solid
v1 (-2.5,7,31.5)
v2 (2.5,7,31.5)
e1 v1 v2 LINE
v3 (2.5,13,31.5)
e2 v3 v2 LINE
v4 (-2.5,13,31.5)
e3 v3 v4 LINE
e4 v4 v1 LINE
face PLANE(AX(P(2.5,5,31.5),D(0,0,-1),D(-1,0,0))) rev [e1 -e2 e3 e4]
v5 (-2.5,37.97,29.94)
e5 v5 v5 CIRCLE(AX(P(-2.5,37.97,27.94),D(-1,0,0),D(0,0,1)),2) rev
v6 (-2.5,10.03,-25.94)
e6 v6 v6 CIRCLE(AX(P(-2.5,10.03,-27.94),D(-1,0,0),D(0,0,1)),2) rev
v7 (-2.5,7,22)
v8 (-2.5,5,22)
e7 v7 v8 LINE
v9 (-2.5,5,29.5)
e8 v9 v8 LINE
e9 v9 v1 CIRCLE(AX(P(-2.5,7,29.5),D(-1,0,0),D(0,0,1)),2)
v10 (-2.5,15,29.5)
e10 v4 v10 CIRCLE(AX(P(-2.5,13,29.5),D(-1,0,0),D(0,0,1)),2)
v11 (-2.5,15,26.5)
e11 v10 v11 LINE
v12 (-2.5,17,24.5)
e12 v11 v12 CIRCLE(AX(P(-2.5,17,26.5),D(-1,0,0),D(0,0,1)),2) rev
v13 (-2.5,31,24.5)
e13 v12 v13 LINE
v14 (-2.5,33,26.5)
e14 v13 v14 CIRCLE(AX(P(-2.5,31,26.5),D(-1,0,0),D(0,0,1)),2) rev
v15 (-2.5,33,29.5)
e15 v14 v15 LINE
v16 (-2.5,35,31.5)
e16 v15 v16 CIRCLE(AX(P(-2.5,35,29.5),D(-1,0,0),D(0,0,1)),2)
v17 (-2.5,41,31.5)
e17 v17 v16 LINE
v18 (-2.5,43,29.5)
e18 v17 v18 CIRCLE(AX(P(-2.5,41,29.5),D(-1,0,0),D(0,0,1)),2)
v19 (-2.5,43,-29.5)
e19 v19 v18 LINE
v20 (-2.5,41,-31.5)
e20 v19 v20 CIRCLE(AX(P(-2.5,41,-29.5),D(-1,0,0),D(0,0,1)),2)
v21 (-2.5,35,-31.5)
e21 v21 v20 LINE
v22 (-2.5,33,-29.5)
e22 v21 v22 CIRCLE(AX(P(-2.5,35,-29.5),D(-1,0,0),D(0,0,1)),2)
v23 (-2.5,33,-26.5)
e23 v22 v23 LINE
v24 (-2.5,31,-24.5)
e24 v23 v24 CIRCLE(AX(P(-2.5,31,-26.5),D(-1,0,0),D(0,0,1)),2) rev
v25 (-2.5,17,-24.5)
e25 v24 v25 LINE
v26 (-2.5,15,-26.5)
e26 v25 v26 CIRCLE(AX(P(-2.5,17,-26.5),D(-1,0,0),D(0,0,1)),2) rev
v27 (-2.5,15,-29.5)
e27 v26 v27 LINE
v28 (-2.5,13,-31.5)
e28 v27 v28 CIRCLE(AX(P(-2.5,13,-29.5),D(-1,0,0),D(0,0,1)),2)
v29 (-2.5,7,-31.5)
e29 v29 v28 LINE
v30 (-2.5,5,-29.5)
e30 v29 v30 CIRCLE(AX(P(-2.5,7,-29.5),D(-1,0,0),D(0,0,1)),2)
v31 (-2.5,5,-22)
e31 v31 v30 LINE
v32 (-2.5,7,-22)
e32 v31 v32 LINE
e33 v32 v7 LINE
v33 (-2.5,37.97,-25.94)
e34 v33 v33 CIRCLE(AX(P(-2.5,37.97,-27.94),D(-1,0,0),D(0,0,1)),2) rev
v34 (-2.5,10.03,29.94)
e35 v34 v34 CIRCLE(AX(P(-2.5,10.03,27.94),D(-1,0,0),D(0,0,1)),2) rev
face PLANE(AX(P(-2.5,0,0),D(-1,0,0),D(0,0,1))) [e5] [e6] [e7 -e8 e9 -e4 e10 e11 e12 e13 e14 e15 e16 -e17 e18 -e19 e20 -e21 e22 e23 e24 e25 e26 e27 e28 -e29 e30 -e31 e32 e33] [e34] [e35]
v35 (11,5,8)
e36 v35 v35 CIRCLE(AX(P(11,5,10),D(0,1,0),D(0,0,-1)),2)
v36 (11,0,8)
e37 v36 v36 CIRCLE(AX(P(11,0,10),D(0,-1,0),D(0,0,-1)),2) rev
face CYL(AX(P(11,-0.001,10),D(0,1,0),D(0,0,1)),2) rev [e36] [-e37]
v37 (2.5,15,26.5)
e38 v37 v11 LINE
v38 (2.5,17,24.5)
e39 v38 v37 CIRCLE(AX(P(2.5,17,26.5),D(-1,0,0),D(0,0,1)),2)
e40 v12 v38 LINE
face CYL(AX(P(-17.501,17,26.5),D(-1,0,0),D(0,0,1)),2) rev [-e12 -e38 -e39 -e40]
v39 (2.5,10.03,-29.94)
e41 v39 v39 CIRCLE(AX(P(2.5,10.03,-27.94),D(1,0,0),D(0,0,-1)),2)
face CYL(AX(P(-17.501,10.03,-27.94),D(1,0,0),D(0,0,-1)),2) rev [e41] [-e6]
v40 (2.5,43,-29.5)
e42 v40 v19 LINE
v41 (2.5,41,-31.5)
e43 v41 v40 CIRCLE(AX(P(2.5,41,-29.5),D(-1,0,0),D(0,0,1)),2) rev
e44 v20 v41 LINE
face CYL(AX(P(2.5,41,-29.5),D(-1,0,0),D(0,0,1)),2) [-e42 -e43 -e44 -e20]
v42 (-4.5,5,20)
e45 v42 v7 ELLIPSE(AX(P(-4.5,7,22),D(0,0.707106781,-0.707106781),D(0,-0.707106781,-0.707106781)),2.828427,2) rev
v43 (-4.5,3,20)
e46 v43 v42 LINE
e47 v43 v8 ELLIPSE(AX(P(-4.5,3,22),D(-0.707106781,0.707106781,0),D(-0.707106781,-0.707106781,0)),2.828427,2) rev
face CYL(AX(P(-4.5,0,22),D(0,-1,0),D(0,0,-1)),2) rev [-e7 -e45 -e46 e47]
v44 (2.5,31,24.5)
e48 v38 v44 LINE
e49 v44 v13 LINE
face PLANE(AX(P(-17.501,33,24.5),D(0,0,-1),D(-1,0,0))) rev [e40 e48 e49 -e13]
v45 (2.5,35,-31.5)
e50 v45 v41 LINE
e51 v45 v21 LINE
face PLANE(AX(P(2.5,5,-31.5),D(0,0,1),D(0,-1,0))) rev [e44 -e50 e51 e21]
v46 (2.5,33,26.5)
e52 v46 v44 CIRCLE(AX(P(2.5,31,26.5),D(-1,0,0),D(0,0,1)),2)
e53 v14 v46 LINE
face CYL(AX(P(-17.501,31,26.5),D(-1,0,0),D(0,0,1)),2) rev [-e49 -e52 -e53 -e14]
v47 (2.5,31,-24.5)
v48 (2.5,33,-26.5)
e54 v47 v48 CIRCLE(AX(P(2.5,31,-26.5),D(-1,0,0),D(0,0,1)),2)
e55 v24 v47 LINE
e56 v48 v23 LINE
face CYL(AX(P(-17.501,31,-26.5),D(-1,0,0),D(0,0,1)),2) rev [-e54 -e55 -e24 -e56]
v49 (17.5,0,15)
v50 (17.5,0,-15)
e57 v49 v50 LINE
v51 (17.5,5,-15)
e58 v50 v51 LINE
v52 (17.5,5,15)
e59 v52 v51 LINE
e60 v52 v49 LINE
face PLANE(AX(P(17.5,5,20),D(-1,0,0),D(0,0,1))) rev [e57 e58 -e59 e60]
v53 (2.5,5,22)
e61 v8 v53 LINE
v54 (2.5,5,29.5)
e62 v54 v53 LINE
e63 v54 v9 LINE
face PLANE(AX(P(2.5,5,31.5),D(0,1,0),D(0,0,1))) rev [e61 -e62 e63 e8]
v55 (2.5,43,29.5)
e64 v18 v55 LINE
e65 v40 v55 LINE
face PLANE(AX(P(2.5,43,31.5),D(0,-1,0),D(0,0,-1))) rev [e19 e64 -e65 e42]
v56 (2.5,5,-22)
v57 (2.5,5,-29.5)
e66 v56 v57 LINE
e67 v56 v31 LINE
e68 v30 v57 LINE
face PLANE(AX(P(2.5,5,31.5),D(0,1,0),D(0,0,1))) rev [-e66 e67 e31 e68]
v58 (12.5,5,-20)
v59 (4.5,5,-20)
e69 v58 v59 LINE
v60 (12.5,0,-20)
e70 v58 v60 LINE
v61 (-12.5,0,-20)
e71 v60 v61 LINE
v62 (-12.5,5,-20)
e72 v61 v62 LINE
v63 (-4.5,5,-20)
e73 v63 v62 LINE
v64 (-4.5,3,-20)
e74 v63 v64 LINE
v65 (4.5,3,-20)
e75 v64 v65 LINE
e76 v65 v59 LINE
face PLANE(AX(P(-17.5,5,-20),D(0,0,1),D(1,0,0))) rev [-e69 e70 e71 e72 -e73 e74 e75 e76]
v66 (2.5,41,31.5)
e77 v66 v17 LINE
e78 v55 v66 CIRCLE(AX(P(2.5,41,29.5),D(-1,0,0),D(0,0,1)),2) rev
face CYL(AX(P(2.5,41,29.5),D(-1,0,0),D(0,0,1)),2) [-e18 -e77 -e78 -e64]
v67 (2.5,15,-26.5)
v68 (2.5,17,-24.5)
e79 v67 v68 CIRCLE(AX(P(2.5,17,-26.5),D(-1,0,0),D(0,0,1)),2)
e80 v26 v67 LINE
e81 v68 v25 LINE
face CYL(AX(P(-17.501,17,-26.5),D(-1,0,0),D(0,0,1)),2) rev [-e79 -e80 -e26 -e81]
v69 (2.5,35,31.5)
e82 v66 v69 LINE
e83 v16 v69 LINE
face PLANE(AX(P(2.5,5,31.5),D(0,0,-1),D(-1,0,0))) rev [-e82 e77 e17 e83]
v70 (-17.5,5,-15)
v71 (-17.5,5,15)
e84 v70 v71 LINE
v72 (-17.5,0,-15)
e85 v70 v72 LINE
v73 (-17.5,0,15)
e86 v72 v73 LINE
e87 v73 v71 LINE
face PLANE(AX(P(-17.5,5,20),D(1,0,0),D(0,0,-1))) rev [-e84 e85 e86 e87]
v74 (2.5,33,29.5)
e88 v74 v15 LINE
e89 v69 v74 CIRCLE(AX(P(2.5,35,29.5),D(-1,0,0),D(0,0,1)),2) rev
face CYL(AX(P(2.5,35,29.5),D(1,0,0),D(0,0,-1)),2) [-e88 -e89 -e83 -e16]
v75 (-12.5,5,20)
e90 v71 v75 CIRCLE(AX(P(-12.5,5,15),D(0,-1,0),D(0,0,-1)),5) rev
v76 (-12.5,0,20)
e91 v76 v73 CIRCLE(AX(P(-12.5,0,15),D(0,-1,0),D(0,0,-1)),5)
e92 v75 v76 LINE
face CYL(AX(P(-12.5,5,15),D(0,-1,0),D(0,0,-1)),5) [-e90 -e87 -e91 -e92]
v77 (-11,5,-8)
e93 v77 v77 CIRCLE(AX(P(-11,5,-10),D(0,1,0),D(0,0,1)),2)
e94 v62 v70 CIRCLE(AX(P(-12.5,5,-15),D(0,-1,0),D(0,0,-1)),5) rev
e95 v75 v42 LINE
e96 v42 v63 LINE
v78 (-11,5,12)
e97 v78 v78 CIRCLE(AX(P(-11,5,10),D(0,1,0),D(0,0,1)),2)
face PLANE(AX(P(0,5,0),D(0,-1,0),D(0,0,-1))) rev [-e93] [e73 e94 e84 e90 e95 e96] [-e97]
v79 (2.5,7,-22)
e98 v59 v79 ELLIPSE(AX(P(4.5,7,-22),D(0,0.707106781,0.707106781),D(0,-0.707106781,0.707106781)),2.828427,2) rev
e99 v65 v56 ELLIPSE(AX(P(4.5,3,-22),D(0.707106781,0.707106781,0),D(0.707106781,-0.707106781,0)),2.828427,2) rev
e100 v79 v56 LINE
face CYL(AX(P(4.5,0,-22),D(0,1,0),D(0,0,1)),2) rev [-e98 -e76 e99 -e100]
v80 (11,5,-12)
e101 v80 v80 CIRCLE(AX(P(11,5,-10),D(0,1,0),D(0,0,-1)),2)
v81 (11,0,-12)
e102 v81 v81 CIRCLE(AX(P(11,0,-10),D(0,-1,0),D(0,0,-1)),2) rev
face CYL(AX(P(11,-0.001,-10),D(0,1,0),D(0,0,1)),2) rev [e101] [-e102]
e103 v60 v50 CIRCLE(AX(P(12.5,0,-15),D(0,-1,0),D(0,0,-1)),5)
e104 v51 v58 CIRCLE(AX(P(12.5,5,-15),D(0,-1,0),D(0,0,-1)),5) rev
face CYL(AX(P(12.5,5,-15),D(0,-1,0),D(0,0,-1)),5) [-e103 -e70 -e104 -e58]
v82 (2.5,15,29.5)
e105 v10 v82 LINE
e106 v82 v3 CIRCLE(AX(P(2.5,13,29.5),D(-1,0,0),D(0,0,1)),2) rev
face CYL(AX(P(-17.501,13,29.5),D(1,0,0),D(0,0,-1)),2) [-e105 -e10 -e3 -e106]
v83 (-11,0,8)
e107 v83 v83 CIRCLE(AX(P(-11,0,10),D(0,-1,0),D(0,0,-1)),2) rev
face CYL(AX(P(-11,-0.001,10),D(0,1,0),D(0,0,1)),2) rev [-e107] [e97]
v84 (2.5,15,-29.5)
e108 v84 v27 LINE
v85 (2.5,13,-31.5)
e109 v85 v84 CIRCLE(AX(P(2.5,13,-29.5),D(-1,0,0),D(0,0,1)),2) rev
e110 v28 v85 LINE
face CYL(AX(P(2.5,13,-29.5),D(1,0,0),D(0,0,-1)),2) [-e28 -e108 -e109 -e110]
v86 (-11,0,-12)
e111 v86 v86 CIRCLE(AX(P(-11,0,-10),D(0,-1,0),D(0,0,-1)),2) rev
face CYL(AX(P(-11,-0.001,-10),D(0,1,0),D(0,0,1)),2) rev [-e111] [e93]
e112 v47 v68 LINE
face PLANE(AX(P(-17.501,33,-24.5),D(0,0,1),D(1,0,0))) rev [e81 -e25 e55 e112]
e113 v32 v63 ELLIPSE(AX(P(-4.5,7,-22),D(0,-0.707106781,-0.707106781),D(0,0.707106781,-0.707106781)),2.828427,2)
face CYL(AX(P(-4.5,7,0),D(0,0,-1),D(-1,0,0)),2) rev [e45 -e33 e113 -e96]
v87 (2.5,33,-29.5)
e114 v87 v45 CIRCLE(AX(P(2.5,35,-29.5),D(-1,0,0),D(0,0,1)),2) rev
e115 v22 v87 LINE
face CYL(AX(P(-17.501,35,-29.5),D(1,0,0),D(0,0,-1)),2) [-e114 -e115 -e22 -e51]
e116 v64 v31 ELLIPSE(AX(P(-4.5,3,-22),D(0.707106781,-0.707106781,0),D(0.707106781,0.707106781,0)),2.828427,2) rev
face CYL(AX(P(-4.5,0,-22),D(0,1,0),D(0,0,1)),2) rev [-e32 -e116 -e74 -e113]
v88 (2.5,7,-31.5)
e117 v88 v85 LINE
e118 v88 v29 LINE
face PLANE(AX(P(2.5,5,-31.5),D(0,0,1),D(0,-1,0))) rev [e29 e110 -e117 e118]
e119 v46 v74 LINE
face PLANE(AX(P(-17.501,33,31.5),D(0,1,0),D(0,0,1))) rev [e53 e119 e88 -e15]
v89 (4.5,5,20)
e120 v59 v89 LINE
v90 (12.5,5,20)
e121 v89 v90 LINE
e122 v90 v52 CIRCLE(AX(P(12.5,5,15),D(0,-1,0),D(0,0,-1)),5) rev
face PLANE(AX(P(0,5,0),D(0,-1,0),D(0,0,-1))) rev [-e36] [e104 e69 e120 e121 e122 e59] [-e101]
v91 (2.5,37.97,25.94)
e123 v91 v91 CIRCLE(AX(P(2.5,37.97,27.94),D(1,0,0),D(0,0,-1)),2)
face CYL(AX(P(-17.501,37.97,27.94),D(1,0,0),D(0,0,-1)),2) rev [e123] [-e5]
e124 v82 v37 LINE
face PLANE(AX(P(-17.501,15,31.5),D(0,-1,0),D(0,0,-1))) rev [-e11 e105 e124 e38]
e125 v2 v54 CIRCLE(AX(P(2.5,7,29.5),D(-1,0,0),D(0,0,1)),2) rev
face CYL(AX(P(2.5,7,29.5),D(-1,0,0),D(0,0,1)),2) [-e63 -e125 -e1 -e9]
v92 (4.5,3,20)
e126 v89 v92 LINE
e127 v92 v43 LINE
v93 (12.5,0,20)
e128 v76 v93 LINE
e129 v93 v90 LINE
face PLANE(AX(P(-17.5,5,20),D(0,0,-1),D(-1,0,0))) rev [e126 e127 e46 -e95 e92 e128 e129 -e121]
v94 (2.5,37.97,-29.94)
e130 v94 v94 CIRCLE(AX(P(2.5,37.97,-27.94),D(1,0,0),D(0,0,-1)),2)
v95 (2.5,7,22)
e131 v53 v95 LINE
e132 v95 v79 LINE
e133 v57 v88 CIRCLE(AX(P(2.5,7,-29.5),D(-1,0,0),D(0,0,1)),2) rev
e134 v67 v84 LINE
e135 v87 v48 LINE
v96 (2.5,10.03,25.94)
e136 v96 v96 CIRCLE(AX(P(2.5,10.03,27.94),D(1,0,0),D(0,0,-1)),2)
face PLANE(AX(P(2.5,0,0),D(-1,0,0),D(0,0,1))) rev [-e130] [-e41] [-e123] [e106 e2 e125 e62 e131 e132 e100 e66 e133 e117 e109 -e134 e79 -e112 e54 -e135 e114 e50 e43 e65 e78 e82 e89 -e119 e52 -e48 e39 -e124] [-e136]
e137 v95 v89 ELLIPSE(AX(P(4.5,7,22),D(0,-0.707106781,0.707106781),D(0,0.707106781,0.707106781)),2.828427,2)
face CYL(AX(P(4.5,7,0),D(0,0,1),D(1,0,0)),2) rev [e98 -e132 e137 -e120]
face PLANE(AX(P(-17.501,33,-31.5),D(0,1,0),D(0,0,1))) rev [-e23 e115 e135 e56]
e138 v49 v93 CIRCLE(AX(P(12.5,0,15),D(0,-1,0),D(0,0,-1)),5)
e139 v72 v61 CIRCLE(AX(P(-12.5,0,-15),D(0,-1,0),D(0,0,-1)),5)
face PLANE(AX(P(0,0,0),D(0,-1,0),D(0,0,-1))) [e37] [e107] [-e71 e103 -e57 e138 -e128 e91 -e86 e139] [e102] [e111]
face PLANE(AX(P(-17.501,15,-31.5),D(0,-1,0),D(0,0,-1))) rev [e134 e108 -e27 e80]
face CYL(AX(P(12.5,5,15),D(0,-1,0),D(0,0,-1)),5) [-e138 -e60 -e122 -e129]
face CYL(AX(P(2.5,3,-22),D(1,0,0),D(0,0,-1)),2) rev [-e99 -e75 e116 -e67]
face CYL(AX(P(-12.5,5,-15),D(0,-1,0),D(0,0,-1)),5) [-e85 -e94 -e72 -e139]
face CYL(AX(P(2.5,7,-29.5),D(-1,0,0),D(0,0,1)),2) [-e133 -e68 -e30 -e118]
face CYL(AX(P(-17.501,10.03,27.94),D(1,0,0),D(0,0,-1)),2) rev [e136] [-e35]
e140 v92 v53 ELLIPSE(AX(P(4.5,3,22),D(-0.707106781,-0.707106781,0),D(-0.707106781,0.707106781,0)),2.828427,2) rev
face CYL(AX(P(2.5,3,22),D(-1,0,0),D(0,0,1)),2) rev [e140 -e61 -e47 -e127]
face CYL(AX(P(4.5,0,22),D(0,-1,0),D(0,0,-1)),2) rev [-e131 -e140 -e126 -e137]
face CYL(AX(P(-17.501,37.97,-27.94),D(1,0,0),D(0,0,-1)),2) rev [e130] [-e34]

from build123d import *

# Parameters (mm, degrees)
ESQUISSE2_W             = 35
ESQUISSE2_H             = 40
BOSS_EXTRU_1_DEPTH      = 5
ESQUISSE3_W             = 63
ESQUISSE3_H             = 38
BOSS_EXTRU_2_DEPTH      = 2.5
ENL_V_MAT_EXTRU_1_REACH = 58.932
ESQUISSE4_R             = 2
ENL_V_MAT_EXTRU_2_REACH = 58.932
ESQUISSE5_W             = 7
ESQUISSE5_H             = 18
CONG_1_R                = 2
CONG_2_R                = 5
CONG_3_R                = 2
ENL_V_MAT_EXTRU_3_REACH = 54.369
ESQUISSE6_R             = 2


with BuildPart() as part:
    # Esquisse2 → Boss.-Extru.1 (new body)
    with BuildSketch(Plane(origin=(0, 0, 0), x_dir=(1, 0, 0), z_dir=(0, 1, 0))):
        Rectangle(ESQUISSE2_W, ESQUISSE2_H)
    extrude(amount=BOSS_EXTRU_1_DEPTH)

    # Esquisse3 → Boss.-Extru.2 (add, symmetric)
    with BuildSketch(Plane(origin=(0, 0, 0), x_dir=(0, 0, -1), z_dir=(1, 0, 0))):
        with Locations((0, 24)):
            Rectangle(ESQUISSE3_W, ESQUISSE3_H)
    extrude(amount=BOSS_EXTRU_2_DEPTH, both=True)

    # Esquisse4 → Enlèv. mat.-Extru.1 (cut, up to next)
    with BuildSketch(Plane(origin=(2.5, 0, 0), x_dir=(0, 0, -1), z_dir=(1, 0, 0)), mode=Mode.PRIVATE) as enl_v_mat_extru_1_sk1:
        with Locations((-27.94, 37.97)):
            Circle(ESQUISSE4_R)
    enl_v_mat_extru_1_tool1 = extrude(enl_v_mat_extru_1_sk1.sketch, amount=-ENL_V_MAT_EXTRU_1_REACH, mode=Mode.PRIVATE) & part.part
    # Esquisse4 → Enlèv. mat.-Extru.1 (cut, up to next)
    with BuildSketch(Plane(origin=(2.5, 0, 0), x_dir=(0, 0, -1), z_dir=(1, 0, 0)), mode=Mode.PRIVATE) as enl_v_mat_extru_1_sk2:
        with Locations((-27.94, 10.03)):
            Circle(ESQUISSE4_R)
    enl_v_mat_extru_1_tool2 = extrude(enl_v_mat_extru_1_sk2.sketch, amount=-ENL_V_MAT_EXTRU_1_REACH, mode=Mode.PRIVATE) & part.part
    # Esquisse4 → Enlèv. mat.-Extru.1 (cut, up to next)
    with BuildSketch(Plane(origin=(2.5, 0, 0), x_dir=(0, 0, -1), z_dir=(1, 0, 0)), mode=Mode.PRIVATE) as enl_v_mat_extru_1_sk3:
        with Locations((27.94, 37.97)):
            Circle(ESQUISSE4_R)
    enl_v_mat_extru_1_tool3 = extrude(enl_v_mat_extru_1_sk3.sketch, amount=-ENL_V_MAT_EXTRU_1_REACH, mode=Mode.PRIVATE) & part.part
    # Esquisse4 → Enlèv. mat.-Extru.1 (cut, up to next)
    with BuildSketch(Plane(origin=(2.5, 0, 0), x_dir=(0, 0, -1), z_dir=(1, 0, 0)), mode=Mode.PRIVATE) as enl_v_mat_extru_1_sk4:
        with Locations((27.94, 10.03)):
            Circle(ESQUISSE4_R)
    enl_v_mat_extru_1_tool4 = extrude(enl_v_mat_extru_1_sk4.sketch, amount=-ENL_V_MAT_EXTRU_1_REACH, mode=Mode.PRIVATE) & part.part
    add(enl_v_mat_extru_1_tool1.solids().sort_by_distance((2.5, 37.97, 27.94))[0], mode=Mode.SUBTRACT)
    add(enl_v_mat_extru_1_tool2.solids().sort_by_distance((2.5, 10.03, 27.94))[0], mode=Mode.SUBTRACT)
    add(enl_v_mat_extru_1_tool3.solids().sort_by_distance((2.5, 37.97, -27.94))[0], mode=Mode.SUBTRACT)
    add(enl_v_mat_extru_1_tool4.solids().sort_by_distance((2.5, 10.03, -27.94))[0], mode=Mode.SUBTRACT)

    # Esquisse5 → Enlèv. mat.-Extru.2 (cut, up to next)
    with BuildSketch(Plane(origin=(2.5, 0, 0), x_dir=(0, 0, -1), z_dir=(1, 0, 0)), mode=Mode.PRIVATE) as enl_v_mat_extru_2_sk1:
        with Locations((-28, 24)):
            Rectangle(ESQUISSE5_W, ESQUISSE5_H)
    enl_v_mat_extru_2_tool1 = extrude(enl_v_mat_extru_2_sk1.sketch, amount=-ENL_V_MAT_EXTRU_2_REACH, mode=Mode.PRIVATE) & part.part
    # Esquisse5 → Enlèv. mat.-Extru.2 (cut, up to next)
    with BuildSketch(Plane(origin=(2.5, 0, 0), x_dir=(0, 0, -1), z_dir=(1, 0, 0)), mode=Mode.PRIVATE) as enl_v_mat_extru_2_sk2:
        with Locations((28, 24)):
            Rectangle(ESQUISSE5_W, ESQUISSE5_H)
    enl_v_mat_extru_2_tool2 = extrude(enl_v_mat_extru_2_sk2.sketch, amount=-ENL_V_MAT_EXTRU_2_REACH, mode=Mode.PRIVATE) & part.part
    add(enl_v_mat_extru_2_tool1.solids().sort_by_distance((2.5, 24, 28))[0], mode=Mode.SUBTRACT)
    add(enl_v_mat_extru_2_tool2.solids().sort_by_distance((2.5, 24, -28))[0], mode=Mode.SUBTRACT)

    # Congé1
    cong_1_edges = [part.edges().sort_by_distance(p)[0] for p in [
        (0, 15, -24.5),
        (0, 33, -24.5),
        (0, 15, 24.5),
        (0, 33, 24.5),
        (-2.5, 5, 0),
        (2.5, 5, 0),
    ]]
    fillet(cong_1_edges, radius=CONG_1_R)
    cong_1_2_edges = [part.edges().sort_by_distance(p)[0] for p in [
        (0, 5, -31.5),
        (0, 15, -31.5),
        (0, 43, -31.5),
        (0, 33, -31.5),
        (0, 5, 31.5),
        (0, 15, 31.5),
        (0, 33, 31.5),
        (0, 43, 31.5),
    ]]
    fillet(cong_1_2_edges, radius=CONG_1_R)

    # Congé2
    cong_2_edges = [part.edges().sort_by_distance(p)[0] for p in [
        (17.5, 2.5, 20),
        (-17.5, 2.5, 20),
        (-17.5, 2.5, -20),
        (17.5, 2.5, -20),
    ]]
    fillet(cong_2_edges, radius=CONG_2_R)

    # Congé3
    cong_3_edges = [part.edges().sort_by_distance(p)[0] for p in [
        (-2.5, 6, 20),
        (2.5, 6, 20),
        (0, 5, 20),
        (2.5, 6, -20),
        (-2.5, 6, -20),
        (0, 5, -20),
    ]]
    fillet(cong_3_edges, radius=CONG_3_R - 0.0001)  # a hair under: the kernel refuses the full size

    # Esquisse6 → Enlèv. mat.-Extru.3 (cut, up to next)
    with BuildSketch(Plane(origin=(0, 5, 0), x_dir=(1, 0, 0), z_dir=(0, 1, 0)), mode=Mode.PRIVATE) as enl_v_mat_extru_3_sk1:
        with Locations(Location((-11, 10, 0), (0, 0, 270))):
            Circle(ESQUISSE6_R)
    enl_v_mat_extru_3_tool1 = extrude(enl_v_mat_extru_3_sk1.sketch, amount=-ENL_V_MAT_EXTRU_3_REACH, mode=Mode.PRIVATE) & part.part
    # Esquisse6 → Enlèv. mat.-Extru.3 (cut, up to next)
    with BuildSketch(Plane(origin=(0, 5, 0), x_dir=(1, 0, 0), z_dir=(0, 1, 0)), mode=Mode.PRIVATE) as enl_v_mat_extru_3_sk2:
        with Locations(Location((-11, -10, 0), (0, 0, 270))):
            Circle(ESQUISSE6_R)
    enl_v_mat_extru_3_tool2 = extrude(enl_v_mat_extru_3_sk2.sketch, amount=-ENL_V_MAT_EXTRU_3_REACH, mode=Mode.PRIVATE) & part.part
    # Esquisse6 → Enlèv. mat.-Extru.3 (cut, up to next)
    with BuildSketch(Plane(origin=(0, 5, 0), x_dir=(1, 0, 0), z_dir=(0, 1, 0)), mode=Mode.PRIVATE) as enl_v_mat_extru_3_sk3:
        with Locations(Location((11, -10, 0), (0, 0, 90))):
            Circle(ESQUISSE6_R)
    enl_v_mat_extru_3_tool3 = extrude(enl_v_mat_extru_3_sk3.sketch, amount=-ENL_V_MAT_EXTRU_3_REACH, mode=Mode.PRIVATE) & part.part
    # Esquisse6 → Enlèv. mat.-Extru.3 (cut, up to next)
    with BuildSketch(Plane(origin=(0, 5, 0), x_dir=(1, 0, 0), z_dir=(0, 1, 0)), mode=Mode.PRIVATE) as enl_v_mat_extru_3_sk4:
        with Locations(Location((11, 10, 0), (0, 0, 90))):
            Circle(ESQUISSE6_R)
    enl_v_mat_extru_3_tool4 = extrude(enl_v_mat_extru_3_sk4.sketch, amount=-ENL_V_MAT_EXTRU_3_REACH, mode=Mode.PRIVATE) & part.part
    add(enl_v_mat_extru_3_tool1.solids().sort_by_distance((-11, 5, -10))[0], mode=Mode.SUBTRACT)
    add(enl_v_mat_extru_3_tool2.solids().sort_by_distance((-11, 5, 10))[0], mode=Mode.SUBTRACT)
    add(enl_v_mat_extru_3_tool3.solids().sort_by_distance((11, 5, 10))[0], mode=Mode.SUBTRACT)
    add(enl_v_mat_extru_3_tool4.solids().sort_by_distance((11, 5, -10))[0], mode=Mode.SUBTRACT)


solid = part.part
